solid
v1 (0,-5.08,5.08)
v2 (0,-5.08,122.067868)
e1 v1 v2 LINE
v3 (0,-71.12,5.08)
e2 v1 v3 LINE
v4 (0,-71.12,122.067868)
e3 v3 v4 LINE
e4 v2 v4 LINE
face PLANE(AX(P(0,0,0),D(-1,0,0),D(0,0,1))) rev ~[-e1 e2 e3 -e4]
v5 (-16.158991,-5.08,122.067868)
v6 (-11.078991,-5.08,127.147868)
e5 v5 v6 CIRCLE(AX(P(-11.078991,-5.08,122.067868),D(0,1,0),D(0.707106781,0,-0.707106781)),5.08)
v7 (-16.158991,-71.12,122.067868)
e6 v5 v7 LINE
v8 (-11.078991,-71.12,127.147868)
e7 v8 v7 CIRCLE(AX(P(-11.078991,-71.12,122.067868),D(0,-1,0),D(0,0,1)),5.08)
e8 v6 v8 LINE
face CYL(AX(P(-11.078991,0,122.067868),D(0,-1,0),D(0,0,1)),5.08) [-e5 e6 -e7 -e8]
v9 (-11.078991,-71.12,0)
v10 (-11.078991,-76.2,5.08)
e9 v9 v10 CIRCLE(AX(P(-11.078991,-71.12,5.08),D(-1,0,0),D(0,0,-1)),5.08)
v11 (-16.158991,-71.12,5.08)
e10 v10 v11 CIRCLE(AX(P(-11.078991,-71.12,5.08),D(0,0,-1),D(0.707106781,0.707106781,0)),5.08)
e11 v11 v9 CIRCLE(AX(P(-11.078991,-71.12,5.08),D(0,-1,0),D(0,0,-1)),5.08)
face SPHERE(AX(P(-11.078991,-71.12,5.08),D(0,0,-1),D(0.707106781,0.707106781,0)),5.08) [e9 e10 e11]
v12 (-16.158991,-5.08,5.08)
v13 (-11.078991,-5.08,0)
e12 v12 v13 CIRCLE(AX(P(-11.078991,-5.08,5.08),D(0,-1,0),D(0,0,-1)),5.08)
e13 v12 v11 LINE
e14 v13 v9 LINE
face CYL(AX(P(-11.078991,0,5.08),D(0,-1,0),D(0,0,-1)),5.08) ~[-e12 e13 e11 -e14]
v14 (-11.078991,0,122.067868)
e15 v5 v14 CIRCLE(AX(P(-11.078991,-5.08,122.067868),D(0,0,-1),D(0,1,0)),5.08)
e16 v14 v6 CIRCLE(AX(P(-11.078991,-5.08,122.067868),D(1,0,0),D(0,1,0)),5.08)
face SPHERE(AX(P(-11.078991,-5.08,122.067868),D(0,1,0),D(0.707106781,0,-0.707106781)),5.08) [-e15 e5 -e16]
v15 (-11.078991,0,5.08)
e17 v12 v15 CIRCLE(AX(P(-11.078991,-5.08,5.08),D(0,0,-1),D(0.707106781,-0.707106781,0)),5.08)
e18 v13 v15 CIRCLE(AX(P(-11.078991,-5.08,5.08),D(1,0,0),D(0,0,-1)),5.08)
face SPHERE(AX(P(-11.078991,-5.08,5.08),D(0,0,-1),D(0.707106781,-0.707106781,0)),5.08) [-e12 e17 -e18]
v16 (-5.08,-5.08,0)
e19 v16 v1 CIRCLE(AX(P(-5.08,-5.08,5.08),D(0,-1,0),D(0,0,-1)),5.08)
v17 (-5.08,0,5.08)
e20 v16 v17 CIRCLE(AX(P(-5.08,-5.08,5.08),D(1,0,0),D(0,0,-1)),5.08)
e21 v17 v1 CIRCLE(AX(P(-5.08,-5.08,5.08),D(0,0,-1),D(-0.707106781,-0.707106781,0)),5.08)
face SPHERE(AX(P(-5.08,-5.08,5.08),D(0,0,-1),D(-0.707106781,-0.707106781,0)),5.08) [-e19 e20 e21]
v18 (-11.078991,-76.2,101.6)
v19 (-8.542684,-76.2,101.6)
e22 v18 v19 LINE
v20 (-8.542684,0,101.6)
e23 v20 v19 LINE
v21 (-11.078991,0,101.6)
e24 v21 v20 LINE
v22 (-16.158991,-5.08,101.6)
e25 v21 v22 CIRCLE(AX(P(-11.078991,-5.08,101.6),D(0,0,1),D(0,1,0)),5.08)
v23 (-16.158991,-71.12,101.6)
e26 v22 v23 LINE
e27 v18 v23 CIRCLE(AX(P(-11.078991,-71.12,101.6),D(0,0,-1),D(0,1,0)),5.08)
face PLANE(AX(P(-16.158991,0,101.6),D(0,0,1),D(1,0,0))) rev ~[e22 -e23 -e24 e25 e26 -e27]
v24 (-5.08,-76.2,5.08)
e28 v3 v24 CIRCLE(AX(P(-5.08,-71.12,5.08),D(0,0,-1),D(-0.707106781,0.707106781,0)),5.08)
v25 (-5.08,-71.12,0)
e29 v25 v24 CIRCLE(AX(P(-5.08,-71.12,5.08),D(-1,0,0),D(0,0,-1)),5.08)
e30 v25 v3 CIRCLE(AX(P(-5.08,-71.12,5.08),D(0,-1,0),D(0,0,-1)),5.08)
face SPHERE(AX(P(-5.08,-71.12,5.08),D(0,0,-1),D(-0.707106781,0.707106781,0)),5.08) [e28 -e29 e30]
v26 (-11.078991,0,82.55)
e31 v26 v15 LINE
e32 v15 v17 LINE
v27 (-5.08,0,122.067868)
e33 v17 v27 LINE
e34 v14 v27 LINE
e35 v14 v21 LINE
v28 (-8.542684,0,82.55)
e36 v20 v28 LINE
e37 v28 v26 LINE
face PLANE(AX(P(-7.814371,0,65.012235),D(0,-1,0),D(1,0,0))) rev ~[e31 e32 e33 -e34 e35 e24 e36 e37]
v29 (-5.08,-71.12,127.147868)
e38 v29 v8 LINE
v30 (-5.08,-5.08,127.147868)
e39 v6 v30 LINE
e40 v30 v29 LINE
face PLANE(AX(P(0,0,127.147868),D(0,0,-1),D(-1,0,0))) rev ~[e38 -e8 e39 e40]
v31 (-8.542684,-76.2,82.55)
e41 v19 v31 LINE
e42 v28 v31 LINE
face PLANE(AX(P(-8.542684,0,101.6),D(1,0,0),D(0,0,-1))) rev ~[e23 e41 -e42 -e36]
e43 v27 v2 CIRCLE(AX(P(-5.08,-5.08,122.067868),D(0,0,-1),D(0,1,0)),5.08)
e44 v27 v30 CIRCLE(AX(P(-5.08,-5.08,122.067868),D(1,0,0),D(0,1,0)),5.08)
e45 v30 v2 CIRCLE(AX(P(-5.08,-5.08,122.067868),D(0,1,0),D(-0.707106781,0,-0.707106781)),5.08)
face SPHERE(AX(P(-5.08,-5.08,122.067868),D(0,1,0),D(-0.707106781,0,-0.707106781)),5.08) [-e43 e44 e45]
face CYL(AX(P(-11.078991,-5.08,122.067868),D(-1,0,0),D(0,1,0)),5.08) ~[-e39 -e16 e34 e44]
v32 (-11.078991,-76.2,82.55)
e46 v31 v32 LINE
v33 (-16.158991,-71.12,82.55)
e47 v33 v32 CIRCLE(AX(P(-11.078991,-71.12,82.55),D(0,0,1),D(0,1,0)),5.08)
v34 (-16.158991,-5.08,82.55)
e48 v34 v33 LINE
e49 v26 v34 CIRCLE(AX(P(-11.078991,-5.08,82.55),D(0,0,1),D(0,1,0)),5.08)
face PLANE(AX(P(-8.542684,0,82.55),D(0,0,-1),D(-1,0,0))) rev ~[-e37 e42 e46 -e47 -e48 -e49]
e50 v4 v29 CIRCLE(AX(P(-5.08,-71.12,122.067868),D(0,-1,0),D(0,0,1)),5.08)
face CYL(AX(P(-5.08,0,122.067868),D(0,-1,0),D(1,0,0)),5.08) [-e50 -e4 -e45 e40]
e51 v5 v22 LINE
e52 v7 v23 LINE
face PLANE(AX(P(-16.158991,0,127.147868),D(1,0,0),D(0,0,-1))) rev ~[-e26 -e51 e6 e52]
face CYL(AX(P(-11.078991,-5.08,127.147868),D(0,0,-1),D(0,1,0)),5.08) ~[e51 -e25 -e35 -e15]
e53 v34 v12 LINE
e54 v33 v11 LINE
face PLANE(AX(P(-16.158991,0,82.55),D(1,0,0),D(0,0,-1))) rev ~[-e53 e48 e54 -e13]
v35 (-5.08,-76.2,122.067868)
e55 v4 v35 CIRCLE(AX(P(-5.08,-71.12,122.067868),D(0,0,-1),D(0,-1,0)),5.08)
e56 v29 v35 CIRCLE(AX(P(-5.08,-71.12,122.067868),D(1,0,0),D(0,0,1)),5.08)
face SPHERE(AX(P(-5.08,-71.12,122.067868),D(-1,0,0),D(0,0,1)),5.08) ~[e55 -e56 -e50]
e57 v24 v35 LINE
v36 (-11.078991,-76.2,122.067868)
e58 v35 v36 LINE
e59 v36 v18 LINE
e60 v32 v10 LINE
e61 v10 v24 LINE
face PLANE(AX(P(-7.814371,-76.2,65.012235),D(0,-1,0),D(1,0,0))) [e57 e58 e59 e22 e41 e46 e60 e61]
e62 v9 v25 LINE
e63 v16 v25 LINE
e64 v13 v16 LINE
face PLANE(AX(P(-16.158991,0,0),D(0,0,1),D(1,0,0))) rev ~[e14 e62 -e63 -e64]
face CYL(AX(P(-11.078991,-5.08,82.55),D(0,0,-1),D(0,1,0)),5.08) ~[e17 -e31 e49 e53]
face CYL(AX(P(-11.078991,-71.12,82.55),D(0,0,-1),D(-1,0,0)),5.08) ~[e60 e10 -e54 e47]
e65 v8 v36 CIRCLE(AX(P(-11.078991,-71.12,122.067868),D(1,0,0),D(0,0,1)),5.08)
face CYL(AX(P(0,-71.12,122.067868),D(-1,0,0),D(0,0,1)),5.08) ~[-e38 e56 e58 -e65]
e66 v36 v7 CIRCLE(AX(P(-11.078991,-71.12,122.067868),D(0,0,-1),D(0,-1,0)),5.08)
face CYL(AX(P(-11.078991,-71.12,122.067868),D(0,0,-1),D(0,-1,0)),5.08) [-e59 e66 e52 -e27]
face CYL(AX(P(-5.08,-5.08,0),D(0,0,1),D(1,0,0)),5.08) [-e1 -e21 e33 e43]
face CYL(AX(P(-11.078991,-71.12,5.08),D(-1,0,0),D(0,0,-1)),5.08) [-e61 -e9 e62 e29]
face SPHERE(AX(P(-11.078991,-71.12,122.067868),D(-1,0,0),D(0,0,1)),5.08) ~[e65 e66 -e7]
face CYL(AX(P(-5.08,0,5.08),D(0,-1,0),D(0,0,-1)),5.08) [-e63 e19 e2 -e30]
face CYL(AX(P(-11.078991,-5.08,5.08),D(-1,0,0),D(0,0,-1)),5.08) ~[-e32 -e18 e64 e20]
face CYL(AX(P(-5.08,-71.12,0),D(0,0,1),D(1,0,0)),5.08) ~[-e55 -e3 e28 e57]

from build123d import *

# Parameters (mm, degrees)
F1_DEPTH     = 76.2
F2_R         = 5.08
F3_R         = 5.08
F4_T1_DEPTH  = 5.998990562
F4_S5_W      = 5.08
F4_S5_H      = 5.08
F4_T6_DEPTH  = 5.08
F4_S11_W     = 5.08
F4_S11_H     = 5.08
F4_T12_DEPTH = 5.08
F4_S17_W     = 5.08
F4_S17_H     = 5.08
F4_T18_DEPTH = 5.08
F4_S23_W     = 5.08
F4_S23_H     = 5.08
F4_T24_DEPTH = 5.08
F4_S29_W     = 5.08
F4_S29_H     = 5.08
F4_T30_DEPTH = 5.08
F4_S35_W     = 5.08
F4_S35_H     = 5.08
F4_T36_DEPTH = 5.08


# Not quite as in the source:
# - a fillet or chamfer that OpenCascade refuses, or shapes differently, is made with other operations: its cross-section is extruded or revolved along the edge and cut away or added


with BuildPart() as f1:
    # F0 (on Front) → F1 (new body)
    with BuildSketch(Plane.XZ):
        Polygon((-16.158990562, 0), (0, 0), (0, 127.1478682756), (-16.158990562, 127.1478682756), (-16.158990562, 101.6), (-8.5426843725, 101.6), (-8.5426843725, 82.55), (-16.158990562, 82.55), align=None)
    extrude(amount=F1_DEPTH)

    # F2
    f2_edges = [f1.edges().sort_by_distance(p)[0] for p in [
        (-8.079495, -76.2, 127.147868),
        (0, -38.1, 0),
        (0, -38.1, 127.147868),
        (0, 0, 63.573934),
        (0, -76.2, 63.573934),
    ]]
    fillet(f2_edges, radius=F2_R)

    # F3
    f3_edges = [f1.edges().sort_by_distance(p)[0] for p in [
        (-16.158991, -76.2, 41.275),
        (-16.158991, 0, 41.275),
        (-16.158991, -38.1, 0),
        (-16.158991, 0, 114.373934),
        (-16.158991, -35.56, 127.147868),
    ]]
    fillet(f3_edges, radius=F3_R)

    # F4: fillet of radius 5.08 on 3 edges, made by hand

    # F4_s2 → F4_t1 (cut)
    with BuildSketch(Plane.YZ.offset(-11.078990562)):
        with BuildLine():
            ThreePointArc((0, 122.0678682756), (-1.4878975516, 125.6599707241), (-5.08, 127.1478682756))
            Line((-5.08, 127.1478682756), (0, 127.1478682756))
            Line((0, 127.1478682756), (0, 122.0678682756))
        make_face()
        with BuildLine():
            ThreePointArc((-5.08, 0), (-1.4878975516, 1.4878975516), (0, 5.08))
            Line((0, 5.08), (0, 0))
            Line((0, 0), (-5.08, 0))
        make_face()
        with BuildLine():
            ThreePointArc((-71.12, 0), (-74.7121024484, 1.4878975516), (-76.2, 5.08))
            Line((-76.2, 5.08), (-76.2, 0))
            Line((-76.2, 0), (-71.12, 0))
        make_face()
    extrude(amount=F4_T1_DEPTH, mode=Mode.SUBTRACT)


with BuildPart() as f4_tool4:
    # F4_s5 → F4_t6 (new body)
    with BuildSketch(Plane.XY.offset(5.08)):
        with Locations((-13.618990562, -73.66)):
            Rectangle(F4_S5_W, F4_S5_H)
    extrude(amount=-F4_T6_DEPTH)

    # F4_s7 → F4_t8 (revolve, cut)
    with BuildSketch(Plane(origin=(-11.078990562, -71.12, 5.08), x_dir=(0.7071067812, 0.7071067812, 0), z_dir=(-0.7071067812, 0.7071067812, 0))):
        with BuildLine():
            ThreePointArc((0, -5.08), (5.08, 0), (0, 5.08))
            Line((0, 5.08), (0, -5.08))
        make_face()
    revolve(axis=Axis((-11.078990562, -71.12, 5.08), (0, 0, -1)), mode=Mode.SUBTRACT)


with BuildPart() as f1_1:
    add(f1.part)

    # F4_t3: cut F4_tool4
    add(f4_tool4.part, mode=Mode.SUBTRACT)


with BuildPart() as f4_tool10:
    # F4_s11 → F4_t12 (new body)
    with BuildSketch(Plane.XY.offset(5.08)):
        with Locations((-2.54, -73.66)):
            Rectangle(F4_S11_W, F4_S11_H)
    extrude(amount=-F4_T12_DEPTH)

    # F4_s13 → F4_t14 (revolve, cut)
    with BuildSketch(Plane(origin=(-5.08, -71.12, 5.08), x_dir=(-0.7071067812, 0.7071067812, 0), z_dir=(-0.7071067812, -0.7071067812, 0))):
        with BuildLine():
            ThreePointArc((0, -5.08), (5.08, 0), (0, 5.08))
            Line((0, 5.08), (0, -5.08))
        make_face()
    revolve(axis=Axis((-5.08, -71.12, 5.08), (0, 0, -1)), mode=Mode.SUBTRACT)


with BuildPart() as f1_2:
    add(f1_1.part)

    # F4_t9: cut F4_tool10
    add(f4_tool10.part, mode=Mode.SUBTRACT)


with BuildPart() as f4_tool16:
    # F4_s17 → F4_t18 (new body)
    with BuildSketch(Plane.XY.offset(5.08)):
        with Locations((-13.618990562, -2.54)):
            Rectangle(F4_S17_W, F4_S17_H)
    extrude(amount=-F4_T18_DEPTH)

    # F4_s19 → F4_t20 (revolve, cut)
    with BuildSketch(Plane(origin=(-11.078990562, -5.08, 5.08), x_dir=(0.7071067812, -0.7071067812, 0), z_dir=(0.7071067812, 0.7071067812, 0))):
        with BuildLine():
            ThreePointArc((0, -5.08), (5.08, 0), (0, 5.08))
            Line((0, 5.08), (0, -5.08))
        make_face()
    revolve(axis=Axis((-11.078990562, -5.08, 5.08), (0, 0, -1)), mode=Mode.SUBTRACT)


with BuildPart() as f1_3:
    add(f1_2.part)

    # F4_t15: cut F4_tool16
    add(f4_tool16.part, mode=Mode.SUBTRACT)


with BuildPart() as f4_tool22:
    # F4_s23 → F4_t24 (new body)
    with BuildSketch(Plane.XY.offset(5.08)):
        with Locations((-2.54, -2.54)):
            Rectangle(F4_S23_W, F4_S23_H)
    extrude(amount=-F4_T24_DEPTH)

    # F4_s25 → F4_t26 (revolve, cut)
    with BuildSketch(Plane(origin=(-5.08, -5.08, 5.08), x_dir=(-0.7071067812, -0.7071067812, 0), z_dir=(0.7071067812, -0.7071067812, 0))):
        with BuildLine():
            ThreePointArc((0, -5.08), (5.08, 0), (0, 5.08))
            Line((0, 5.08), (0, -5.08))
        make_face()
    revolve(axis=Axis((-5.08, -5.08, 5.08), (0, 0, -1)), mode=Mode.SUBTRACT)


with BuildPart() as f1_4:
    add(f1_3.part)

    # F4_t21: cut F4_tool22
    add(f4_tool22.part, mode=Mode.SUBTRACT)


with BuildPart() as f4_tool28:
    # F4_s29 → F4_t30 (new body)
    with BuildSketch(Plane.XZ.offset(5.08)):
        with Locations((-2.54, 124.6078682756)):
            Rectangle(F4_S29_W, F4_S29_H)
    extrude(amount=-F4_T30_DEPTH)

    # F4_s31 → F4_t32 (revolve, cut)
    with BuildSketch(Plane(origin=(-5.08, -5.08, 122.0678682756), x_dir=(-0.7071067812, 0, -0.7071067812), z_dir=(0.7071067812, 0, -0.7071067812))):
        with BuildLine():
            ThreePointArc((0, -5.08), (5.08, 0), (0, 5.08))
            Line((0, 5.08), (0, -5.08))
        make_face()
    revolve(axis=Axis((-5.08, -5.08, 122.0678682756), (0, 1, 0)), mode=Mode.SUBTRACT)


with BuildPart() as f1_5:
    add(f1_4.part)

    # F4_t27: cut F4_tool28
    add(f4_tool28.part, mode=Mode.SUBTRACT)


with BuildPart() as f4_tool34:
    # F4_s35 → F4_t36 (new body)
    with BuildSketch(Plane.XZ.offset(5.08)):
        with Locations((-13.618990562, 124.6078682756)):
            Rectangle(F4_S35_W, F4_S35_H)
    extrude(amount=-F4_T36_DEPTH)

    # F4_s37 → F4_t38 (revolve, cut)
    with BuildSketch(Plane(origin=(-11.078990562, -5.08, 122.0678682756), x_dir=(0.7071067812, 0, -0.7071067812), z_dir=(0.7071067812, 0, 0.7071067812))):
        with BuildLine():
            ThreePointArc((0, -5.08), (5.08, 0), (0, 5.08))
            Line((0, 5.08), (0, -5.08))
        make_face()
    revolve(axis=Axis((-11.078990562, -5.08, 122.0678682756), (0, 1, 0)), mode=Mode.SUBTRACT)


with BuildPart() as f1_6:
    add(f1_5.part)

    # F4_t33: cut F4_tool34
    add(f4_tool34.part, mode=Mode.SUBTRACT)


solid = f1_6.part
